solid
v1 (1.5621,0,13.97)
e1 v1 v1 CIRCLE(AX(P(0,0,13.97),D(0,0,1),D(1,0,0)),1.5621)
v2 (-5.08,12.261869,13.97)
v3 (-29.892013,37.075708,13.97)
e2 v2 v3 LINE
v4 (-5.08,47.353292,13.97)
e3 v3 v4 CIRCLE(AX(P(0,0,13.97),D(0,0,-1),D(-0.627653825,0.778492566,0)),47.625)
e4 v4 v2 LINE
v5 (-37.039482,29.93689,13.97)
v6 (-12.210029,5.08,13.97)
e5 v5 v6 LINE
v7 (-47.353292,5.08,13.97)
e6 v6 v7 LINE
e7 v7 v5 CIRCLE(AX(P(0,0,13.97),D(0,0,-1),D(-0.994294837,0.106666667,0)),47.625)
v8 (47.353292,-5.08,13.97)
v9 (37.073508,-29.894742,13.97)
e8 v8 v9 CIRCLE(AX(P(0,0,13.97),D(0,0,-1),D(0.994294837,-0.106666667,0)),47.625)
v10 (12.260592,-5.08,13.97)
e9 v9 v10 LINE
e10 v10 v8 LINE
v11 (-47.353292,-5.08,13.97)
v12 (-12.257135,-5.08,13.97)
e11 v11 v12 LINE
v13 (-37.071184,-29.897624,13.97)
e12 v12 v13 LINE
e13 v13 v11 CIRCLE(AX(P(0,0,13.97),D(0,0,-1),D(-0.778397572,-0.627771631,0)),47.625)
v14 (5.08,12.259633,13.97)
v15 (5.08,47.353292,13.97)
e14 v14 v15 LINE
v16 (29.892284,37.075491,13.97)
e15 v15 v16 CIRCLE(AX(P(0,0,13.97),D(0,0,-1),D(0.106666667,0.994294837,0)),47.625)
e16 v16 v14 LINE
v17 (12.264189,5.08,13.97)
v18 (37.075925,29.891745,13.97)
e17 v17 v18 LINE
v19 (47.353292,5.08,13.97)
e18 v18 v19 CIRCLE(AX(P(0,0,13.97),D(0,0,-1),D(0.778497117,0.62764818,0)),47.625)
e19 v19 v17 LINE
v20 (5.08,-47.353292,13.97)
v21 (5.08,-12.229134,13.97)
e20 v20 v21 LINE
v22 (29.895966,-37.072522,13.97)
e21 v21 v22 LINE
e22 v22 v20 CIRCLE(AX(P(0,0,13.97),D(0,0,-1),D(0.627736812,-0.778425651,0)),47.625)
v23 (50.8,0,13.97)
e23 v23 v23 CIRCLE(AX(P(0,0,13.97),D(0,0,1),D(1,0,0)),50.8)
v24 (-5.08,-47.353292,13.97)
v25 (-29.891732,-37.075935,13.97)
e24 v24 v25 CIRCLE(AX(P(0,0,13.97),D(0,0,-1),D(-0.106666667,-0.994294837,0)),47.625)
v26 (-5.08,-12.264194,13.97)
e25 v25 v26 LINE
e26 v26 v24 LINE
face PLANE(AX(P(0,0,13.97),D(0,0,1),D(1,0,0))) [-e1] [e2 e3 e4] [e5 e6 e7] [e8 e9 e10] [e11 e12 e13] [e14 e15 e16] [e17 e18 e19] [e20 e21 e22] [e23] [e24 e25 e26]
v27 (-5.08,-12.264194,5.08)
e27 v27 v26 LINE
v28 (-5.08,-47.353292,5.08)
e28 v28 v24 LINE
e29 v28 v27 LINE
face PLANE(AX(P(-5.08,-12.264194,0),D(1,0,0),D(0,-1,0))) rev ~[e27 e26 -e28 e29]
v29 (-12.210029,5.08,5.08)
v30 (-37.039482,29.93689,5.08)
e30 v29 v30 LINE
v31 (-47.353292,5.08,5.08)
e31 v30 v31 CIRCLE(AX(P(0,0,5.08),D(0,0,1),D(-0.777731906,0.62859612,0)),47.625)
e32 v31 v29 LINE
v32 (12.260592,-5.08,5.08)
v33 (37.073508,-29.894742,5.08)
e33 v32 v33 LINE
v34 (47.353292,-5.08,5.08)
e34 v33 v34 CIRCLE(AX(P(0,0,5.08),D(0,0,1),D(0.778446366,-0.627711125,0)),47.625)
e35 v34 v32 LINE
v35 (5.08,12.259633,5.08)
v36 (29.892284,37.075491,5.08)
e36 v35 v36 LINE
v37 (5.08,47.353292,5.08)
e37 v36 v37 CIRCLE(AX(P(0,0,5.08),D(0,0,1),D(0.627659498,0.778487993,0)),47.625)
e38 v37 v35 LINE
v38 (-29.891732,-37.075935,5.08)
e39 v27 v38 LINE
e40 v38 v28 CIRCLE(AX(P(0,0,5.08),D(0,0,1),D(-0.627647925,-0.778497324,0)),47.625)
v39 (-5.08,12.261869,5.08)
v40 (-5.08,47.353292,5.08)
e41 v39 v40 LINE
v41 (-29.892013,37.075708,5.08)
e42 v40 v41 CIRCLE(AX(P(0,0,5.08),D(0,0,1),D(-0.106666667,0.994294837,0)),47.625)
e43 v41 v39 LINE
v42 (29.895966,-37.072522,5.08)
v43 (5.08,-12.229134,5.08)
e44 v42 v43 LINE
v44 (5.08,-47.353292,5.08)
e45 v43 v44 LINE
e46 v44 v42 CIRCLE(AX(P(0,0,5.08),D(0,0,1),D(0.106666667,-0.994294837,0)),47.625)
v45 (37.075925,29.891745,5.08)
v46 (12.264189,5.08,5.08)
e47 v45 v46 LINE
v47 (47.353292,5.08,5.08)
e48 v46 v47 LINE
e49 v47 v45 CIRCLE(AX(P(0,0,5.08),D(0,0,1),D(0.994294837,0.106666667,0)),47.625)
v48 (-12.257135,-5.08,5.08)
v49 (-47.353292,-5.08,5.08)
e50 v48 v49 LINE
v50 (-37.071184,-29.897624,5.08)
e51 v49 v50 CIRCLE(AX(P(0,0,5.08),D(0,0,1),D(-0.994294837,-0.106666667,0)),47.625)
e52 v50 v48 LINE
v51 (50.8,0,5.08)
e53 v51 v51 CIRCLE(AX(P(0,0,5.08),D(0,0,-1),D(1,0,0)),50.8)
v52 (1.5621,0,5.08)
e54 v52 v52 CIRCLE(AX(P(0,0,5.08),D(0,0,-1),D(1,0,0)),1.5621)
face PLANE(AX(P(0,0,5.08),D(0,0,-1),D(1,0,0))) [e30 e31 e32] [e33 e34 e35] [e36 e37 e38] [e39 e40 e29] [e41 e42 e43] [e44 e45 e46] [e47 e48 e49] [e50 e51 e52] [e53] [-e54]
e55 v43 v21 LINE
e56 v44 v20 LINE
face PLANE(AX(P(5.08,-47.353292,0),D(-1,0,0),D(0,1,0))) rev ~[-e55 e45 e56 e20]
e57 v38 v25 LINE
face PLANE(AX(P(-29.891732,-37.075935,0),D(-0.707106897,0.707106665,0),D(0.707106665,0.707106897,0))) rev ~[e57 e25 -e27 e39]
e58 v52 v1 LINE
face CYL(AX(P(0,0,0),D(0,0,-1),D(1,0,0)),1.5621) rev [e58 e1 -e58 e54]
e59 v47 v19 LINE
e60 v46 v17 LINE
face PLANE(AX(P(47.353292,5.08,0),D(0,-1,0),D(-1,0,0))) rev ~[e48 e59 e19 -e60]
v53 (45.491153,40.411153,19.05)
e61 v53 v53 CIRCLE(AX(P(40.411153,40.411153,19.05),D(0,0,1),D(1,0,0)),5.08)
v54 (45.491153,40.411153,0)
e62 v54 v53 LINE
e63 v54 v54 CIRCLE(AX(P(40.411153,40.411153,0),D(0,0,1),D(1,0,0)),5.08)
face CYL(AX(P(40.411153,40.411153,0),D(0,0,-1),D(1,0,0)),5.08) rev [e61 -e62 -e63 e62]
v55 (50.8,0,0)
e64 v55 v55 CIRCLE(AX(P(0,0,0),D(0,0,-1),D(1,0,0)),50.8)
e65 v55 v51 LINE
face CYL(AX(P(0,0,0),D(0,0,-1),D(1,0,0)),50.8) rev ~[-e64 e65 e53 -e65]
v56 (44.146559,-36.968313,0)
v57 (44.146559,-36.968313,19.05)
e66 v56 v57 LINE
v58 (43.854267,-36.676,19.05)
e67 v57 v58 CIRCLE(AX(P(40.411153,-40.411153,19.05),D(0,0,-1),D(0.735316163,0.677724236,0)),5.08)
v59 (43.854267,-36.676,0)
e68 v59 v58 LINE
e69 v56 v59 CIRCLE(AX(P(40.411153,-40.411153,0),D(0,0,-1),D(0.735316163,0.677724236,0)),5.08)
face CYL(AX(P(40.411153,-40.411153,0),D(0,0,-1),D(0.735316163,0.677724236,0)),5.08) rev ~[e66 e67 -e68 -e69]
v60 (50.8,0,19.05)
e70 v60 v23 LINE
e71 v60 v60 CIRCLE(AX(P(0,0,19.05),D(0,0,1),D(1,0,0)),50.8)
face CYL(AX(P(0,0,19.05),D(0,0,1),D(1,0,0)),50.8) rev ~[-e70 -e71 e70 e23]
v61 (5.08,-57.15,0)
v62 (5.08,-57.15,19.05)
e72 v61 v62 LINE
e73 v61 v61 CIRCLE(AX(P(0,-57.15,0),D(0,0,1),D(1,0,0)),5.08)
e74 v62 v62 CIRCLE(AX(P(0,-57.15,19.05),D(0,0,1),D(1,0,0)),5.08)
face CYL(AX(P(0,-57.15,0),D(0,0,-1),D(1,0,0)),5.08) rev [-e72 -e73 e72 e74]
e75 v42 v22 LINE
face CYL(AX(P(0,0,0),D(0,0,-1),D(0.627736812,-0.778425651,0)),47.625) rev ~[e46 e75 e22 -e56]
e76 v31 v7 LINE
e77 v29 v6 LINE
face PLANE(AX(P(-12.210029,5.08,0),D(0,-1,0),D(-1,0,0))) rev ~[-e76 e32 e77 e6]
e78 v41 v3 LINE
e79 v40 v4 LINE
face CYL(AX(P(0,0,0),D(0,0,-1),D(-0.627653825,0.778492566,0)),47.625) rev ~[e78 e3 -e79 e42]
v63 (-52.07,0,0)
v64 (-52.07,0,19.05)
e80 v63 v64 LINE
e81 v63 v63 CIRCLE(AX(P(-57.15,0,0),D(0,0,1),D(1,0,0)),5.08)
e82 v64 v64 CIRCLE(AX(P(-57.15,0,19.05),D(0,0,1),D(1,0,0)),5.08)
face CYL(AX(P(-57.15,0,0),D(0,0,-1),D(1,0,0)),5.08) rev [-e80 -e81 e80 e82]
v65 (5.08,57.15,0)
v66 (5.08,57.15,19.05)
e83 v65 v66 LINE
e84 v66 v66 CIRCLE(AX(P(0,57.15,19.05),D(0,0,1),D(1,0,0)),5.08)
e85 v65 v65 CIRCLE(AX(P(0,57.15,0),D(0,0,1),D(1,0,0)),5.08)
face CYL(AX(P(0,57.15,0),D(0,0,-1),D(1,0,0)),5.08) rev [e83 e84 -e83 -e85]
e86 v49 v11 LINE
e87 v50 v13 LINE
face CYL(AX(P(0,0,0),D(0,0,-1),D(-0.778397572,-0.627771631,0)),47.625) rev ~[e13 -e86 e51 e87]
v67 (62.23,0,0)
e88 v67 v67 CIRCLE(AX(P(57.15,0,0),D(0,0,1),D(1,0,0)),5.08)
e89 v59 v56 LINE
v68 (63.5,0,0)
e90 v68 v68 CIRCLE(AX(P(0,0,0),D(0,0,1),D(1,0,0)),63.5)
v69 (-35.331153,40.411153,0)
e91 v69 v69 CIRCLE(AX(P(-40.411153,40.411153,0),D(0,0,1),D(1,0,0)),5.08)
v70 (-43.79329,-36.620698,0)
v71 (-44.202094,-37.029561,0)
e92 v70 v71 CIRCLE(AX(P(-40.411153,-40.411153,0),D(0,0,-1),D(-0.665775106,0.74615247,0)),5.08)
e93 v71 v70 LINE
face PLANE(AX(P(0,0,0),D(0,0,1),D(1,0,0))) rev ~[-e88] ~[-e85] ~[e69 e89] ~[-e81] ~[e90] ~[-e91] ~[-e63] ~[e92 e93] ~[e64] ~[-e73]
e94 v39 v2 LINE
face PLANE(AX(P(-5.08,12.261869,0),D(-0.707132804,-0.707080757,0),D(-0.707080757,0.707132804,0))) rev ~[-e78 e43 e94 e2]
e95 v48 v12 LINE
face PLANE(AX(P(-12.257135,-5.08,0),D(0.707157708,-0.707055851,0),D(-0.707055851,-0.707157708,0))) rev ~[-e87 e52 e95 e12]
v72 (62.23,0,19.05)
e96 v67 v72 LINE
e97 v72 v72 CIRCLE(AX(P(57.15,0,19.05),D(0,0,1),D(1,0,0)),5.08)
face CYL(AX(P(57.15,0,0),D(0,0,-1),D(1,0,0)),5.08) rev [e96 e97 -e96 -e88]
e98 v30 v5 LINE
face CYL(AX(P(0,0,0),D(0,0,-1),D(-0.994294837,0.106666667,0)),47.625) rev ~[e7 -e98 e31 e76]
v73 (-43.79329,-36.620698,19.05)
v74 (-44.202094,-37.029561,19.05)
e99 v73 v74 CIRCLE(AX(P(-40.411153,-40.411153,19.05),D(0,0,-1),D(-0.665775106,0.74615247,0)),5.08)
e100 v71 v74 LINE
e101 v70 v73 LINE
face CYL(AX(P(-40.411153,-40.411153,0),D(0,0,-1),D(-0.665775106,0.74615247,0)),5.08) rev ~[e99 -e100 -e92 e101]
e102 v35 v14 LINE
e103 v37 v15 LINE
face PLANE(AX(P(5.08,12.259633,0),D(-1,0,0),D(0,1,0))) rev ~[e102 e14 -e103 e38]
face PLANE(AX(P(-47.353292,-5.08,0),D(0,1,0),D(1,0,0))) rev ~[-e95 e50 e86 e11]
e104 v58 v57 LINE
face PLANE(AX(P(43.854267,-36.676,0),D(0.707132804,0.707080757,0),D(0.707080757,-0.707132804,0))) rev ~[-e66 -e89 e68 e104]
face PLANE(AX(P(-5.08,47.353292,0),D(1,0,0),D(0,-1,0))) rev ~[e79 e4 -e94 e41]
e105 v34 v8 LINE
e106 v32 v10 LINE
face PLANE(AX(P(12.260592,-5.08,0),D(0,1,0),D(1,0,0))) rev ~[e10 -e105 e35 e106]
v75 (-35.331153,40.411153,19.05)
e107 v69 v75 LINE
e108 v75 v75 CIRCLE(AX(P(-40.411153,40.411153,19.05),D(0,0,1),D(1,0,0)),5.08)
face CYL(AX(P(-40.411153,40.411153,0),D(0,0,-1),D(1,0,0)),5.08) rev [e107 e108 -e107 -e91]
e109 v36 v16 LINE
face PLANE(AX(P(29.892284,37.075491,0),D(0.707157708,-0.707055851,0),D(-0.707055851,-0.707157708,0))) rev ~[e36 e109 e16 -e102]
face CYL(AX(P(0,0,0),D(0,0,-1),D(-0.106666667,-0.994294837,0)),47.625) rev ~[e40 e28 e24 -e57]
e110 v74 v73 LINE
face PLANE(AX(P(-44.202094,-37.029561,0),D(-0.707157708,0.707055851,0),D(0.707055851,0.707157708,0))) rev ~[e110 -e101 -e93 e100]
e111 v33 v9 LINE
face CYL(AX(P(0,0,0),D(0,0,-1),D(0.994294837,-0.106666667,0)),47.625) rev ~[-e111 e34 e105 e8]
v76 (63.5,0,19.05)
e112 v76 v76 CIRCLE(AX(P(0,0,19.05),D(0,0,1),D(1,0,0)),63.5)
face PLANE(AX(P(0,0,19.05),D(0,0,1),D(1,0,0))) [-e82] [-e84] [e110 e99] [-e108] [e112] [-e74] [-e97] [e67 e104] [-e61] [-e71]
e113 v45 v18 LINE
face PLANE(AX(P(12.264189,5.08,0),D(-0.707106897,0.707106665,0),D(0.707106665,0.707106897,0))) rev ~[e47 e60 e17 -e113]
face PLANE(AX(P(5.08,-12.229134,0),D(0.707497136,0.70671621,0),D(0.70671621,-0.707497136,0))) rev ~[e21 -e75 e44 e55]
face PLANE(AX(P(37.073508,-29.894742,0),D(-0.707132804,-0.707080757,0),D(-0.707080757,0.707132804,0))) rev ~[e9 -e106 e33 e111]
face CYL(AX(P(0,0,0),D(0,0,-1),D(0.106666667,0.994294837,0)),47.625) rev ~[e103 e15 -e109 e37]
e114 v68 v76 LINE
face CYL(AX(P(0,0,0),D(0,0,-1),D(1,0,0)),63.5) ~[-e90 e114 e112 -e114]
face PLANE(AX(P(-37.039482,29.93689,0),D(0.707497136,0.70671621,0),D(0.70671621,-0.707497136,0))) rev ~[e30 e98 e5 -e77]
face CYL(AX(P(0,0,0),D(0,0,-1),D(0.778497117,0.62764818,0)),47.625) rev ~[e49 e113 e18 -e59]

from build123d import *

# Parameters (mm, degrees)
F0_R     = 63.5
F0_R_2   = 5.08
F0_R_3   = 1.5621
F1_DEPTH = 19.05
F2_R     = 50.8
F2_R_2   = 1.5621
F3_DEPTH = 5.08
F4_R     = 50.8
F4_R_2   = 1.5621
F5_DEPTH = 5.08


with BuildPart() as f1:
    # F0 (on Top) → F1 (new body)
    with BuildSketch(Plane.XY):
        Circle(F0_R)
        with BuildLine():
            ThreePointArc((-43.7932900831, -36.6206979979), (-36.8187913893, -44.0029962675), (-44.2020942404, -37.0295610466))
            Line((-44.2020942404, -37.0295610466), (-43.7932900831, -36.6206979979))
        make_face(mode=Mode.SUBTRACT)
        with BuildLine():
            Line((-5.08, -12.2641944787), (-5.08, -47.3532915963))
            Line((-5.08, -47.3532915963), (-5.08, -50.545361805))
            ThreePointArc((-5.08, -50.545361805), (-19.4403188674, -46.9330800431), (-32.1488664849, -39.3330698488))
            Line((-32.1488664849, -39.3330698488), (-29.8917324097, -37.0759350327))
            Line((-29.8917324097, -37.0759350327), (-5.08, -12.2641944787))
        make_face(mode=Mode.SUBTRACT)
        with BuildLine():
            ThreePointArc((-39.328136569, -32.154901244), (-46.9315884756, -19.4439194393), (-50.545361805, -5.08))
            Line((-50.545361805, -5.08), (-47.3532915963, -5.08))
            Line((-47.3532915963, -5.08), (-12.2571351119, -5.08))
            Line((-12.2571351119, -5.08), (-37.0711843605, -29.8976239041))
            Line((-37.0711843605, -29.8976239041), (-39.328136569, -32.154901244))
        make_face(mode=Mode.SUBTRACT)
        with Locations((0, -57.15)):
            Circle(F0_R_2, mode=Mode.SUBTRACT)
        with BuildLine():
            ThreePointArc((44.1465586521, -36.9683134237), (36.8189179009, -44.0031227929), (43.8542666003, -36.675999857))
            Line((43.8542666003, -36.675999857), (44.1465586521, -36.9683134237))
        make_face(mode=Mode.SUBTRACT)
        with BuildLine():
            ThreePointArc((32.151702841, -39.3307513839), (19.4420111057, -46.9323790593), (5.08, -50.545361805))
            Line((5.08, -50.545361805), (5.08, -47.3532915963))
            Line((5.08, -47.3532915963), (5.08, -12.2291341303))
            Line((5.08, -12.2291341303), (29.8959656944, -37.0725216326))
            Line((29.8959656944, -37.0725216326), (32.151702841, -39.3307513839))
        make_face(mode=Mode.SUBTRACT)
        with BuildLine():
            ThreePointArc((50.545361805, -5.08), (46.9323180233, -19.4421584439), (39.3305495108, -32.1519497882))
            Line((39.3305495108, -32.1519497882), (37.0735081629, -29.8947423052))
            Line((37.0735081629, -29.8947423052), (12.2605922736, -5.08))
            Line((12.2605922736, -5.08), (47.3532915963, -5.08))
            Line((47.3532915963, -5.08), (50.545361805, -5.08))
        make_face(mode=Mode.SUBTRACT)
        with Locations((-57.15, 0)):
            Circle(F0_R_2, mode=Mode.SUBTRACT)
        with BuildLine():
            ThreePointArc((-50.545361805, 5.08), (-46.921636061, 19.4679241152), (-39.2952191809, 32.1951199645))
            Line((-39.2952191809, 32.1951199645), (-37.0394820342, 29.9368902132))
            Line((-37.0394820342, 29.9368902132), (-12.2100285331, 5.08))
            Line((-12.2100285331, 5.08), (-47.3532915963, 5.08))
            Line((-47.3532915963, 5.08), (-50.545361805, 5.08))
        make_face(mode=Mode.SUBTRACT)
        with BuildLine():
            ThreePointArc((-32.1490547855, 39.3329159407), (-19.4404312097, 46.9330335092), (-5.08, 50.545361805))
            Line((-5.08, 50.545361805), (-5.08, 47.3532915963))
            Line((-5.08, 47.3532915963), (-5.08, 12.2618686706))
            Line((-5.08, 12.2618686706), (-29.8920134376, 37.0757084577))
            Line((-29.8920134376, 37.0757084577), (-32.1490547855, 39.3329159407))
        make_face(mode=Mode.SUBTRACT)
        with Locations((-40.4111525448, 40.4111525448)):
            Circle(F0_R_2, mode=Mode.SUBTRACT)
        Circle(F0_R_3, mode=Mode.SUBTRACT)
        with BuildLine():
            ThreePointArc((39.3330592962, 32.1488793958), (46.9330768525, 19.4403265702), (50.545361805, 5.08))
            Line((50.545361805, 5.08), (47.3532915963, 5.08))
            Line((47.3532915963, 5.08), (12.2641887856, 5.08))
            Line((12.2641887856, 5.08), (37.0759252209, 29.8917445796))
            Line((37.0759252209, 29.8917445796), (39.3330592962, 32.1488793958))
        make_face(mode=Mode.SUBTRACT)
        with BuildLine():
            Line((29.8922835881, 37.0754906493), (5.08, 12.2596326602))
            Line((5.08, 12.2596326602), (5.08, 47.3532915963))
            Line((5.08, 47.3532915963), (5.08, 50.545361805))
            ThreePointArc((5.08, 50.545361805), (19.4405392034, 46.9329887764), (32.1492357966, 39.3327679892))
            Line((32.1492357966, 39.3327679892), (29.8922835881, 37.0754906493))
        make_face(mode=Mode.SUBTRACT)
        with Locations((57.15, 0)):
            Circle(F0_R_2, mode=Mode.SUBTRACT)
        with Locations((0, 57.15)):
            Circle(F0_R_2, mode=Mode.SUBTRACT)
        with Locations((40.4111525448, 40.4111525448)):
            Circle(F0_R_2, mode=Mode.SUBTRACT)
        with BuildLine():
            Line((-37.0394820342, 29.9368902132), (-39.2952191809, 32.1951199645))
            ThreePointArc((-39.2952191809, 32.1951199645), (-46.921636061, 19.4679241152), (-50.545361805, 5.08))
            Line((-50.545361805, 5.08), (-47.3532915963, 5.08))
            ThreePointArc((-47.3532915963, 5.08), (-43.9886497637, 18.2521044532), (-37.0394820342, 29.9368902132))
        make_face()
        with BuildLine():
            Line((-5.08, 47.3532915963), (-5.08, 50.545361805))
            ThreePointArc((-5.08, 50.545361805), (-19.4404312097, 46.9330335092), (-32.1490547855, 39.3329159407))
            Line((-32.1490547855, 39.3329159407), (-29.8920134376, 37.0757084577))
            ThreePointArc((-29.8920134376, 37.0757084577), (-18.2254659683, 43.9996933539), (-5.08, 47.3532915963))
        make_face()
        with BuildLine():
            Line((-47.3532915963, -5.08), (-50.545361805, -5.08))
            ThreePointArc((-50.545361805, -5.08), (-46.9315884756, -19.4439194393), (-39.328136569, -32.154901244))
            Line((-39.328136569, -32.154901244), (-37.0711843605, -29.8976239041))
            ThreePointArc((-37.0711843605, -29.8976239041), (-43.9983141632, -18.2287952371), (-47.3532915963, -5.08))
        make_face()
        with BuildLine():
            Line((-5.08, -50.545361805), (-5.08, -47.3532915963))
            ThreePointArc((-5.08, -47.3532915963), (-18.2252992134, -43.9997624264), (-29.8917324097, -37.0759350327))
            Line((-29.8917324097, -37.0759350327), (-32.1488664849, -39.3330698488))
            ThreePointArc((-32.1488664849, -39.3330698488), (-19.4403188674, -46.9330800431), (-5.08, -50.545361805))
        make_face()
        with BuildLine():
            Line((5.08, -47.3532915963), (5.08, -50.545361805))
            ThreePointArc((5.08, -50.545361805), (19.4420111057, -46.9323790593), (32.151702841, -39.3307513839))
            Line((32.151702841, -39.3307513839), (29.8959656944, -37.0725216326))
            ThreePointArc((29.8959656944, -37.0725216326), (18.2278112187, -43.9987218357), (5.08, -47.3532915963))
        make_face()
        with BuildLine():
            Line((37.0735081629, -29.8947423052), (39.3305495108, -32.1519497882))
            ThreePointArc((39.3305495108, -32.1519497882), (46.9323180233, -19.4421584439), (50.545361805, -5.08))
            Line((50.545361805, -5.08), (47.3532915963, -5.08))
            ThreePointArc((47.3532915963, -5.08), (43.9990225836, -18.2270852494), (37.0735081629, -29.8947423052))
        make_face()
        with BuildLine():
            Line((47.3532915963, 5.08), (50.545361805, 5.08))
            ThreePointArc((50.545361805, 5.08), (46.9330768525, 19.4403265702), (39.3330592962, 32.1488793958))
            Line((39.3330592962, 32.1488793958), (37.0759252209, 29.8917445796))
            ThreePointArc((37.0759252209, 29.8917445796), (43.9997594353, 18.2253064347), (47.3532915963, 5.08))
        make_face()
        with BuildLine():
            ThreePointArc((5.08, 47.3532915963), (18.2256262696, 43.9996269539), (29.8922835881, 37.0754906493))
            Line((29.8922835881, 37.0754906493), (32.1492357966, 39.3327679892))
            ThreePointArc((32.1492357966, 39.3327679892), (19.4405392034, 46.9329887764), (5.08, 50.545361805))
            Line((5.08, 50.545361805), (5.08, 47.3532915963))
        make_face()
    extrude(amount=F1_DEPTH)

    # F2 (on face) → F3 (cut)
    with BuildSketch(Plane(origin=(0, 0, 0), x_dir=(1, 0, 0), z_dir=(0, 0, -1))):
        Circle(F2_R)
        with BuildLine():
            Line((-29.8920134376, -37.0757084577), (-5.08, -12.2618686706))
            Line((-5.08, -12.2618686706), (-5.08, -47.3532915963))
            ThreePointArc((-5.08, -47.3532915963), (-18.2254659683, -43.9996933539), (-29.8920134376, -37.0757084577))
        make_face(mode=Mode.SUBTRACT)
        with BuildLine():
            Line((-47.3532915963, -5.08), (-12.2100285331, -5.08))
            Line((-12.2100285331, -5.08), (-37.0394820342, -29.9368902132))
            ThreePointArc((-37.0394820342, -29.9368902132), (-43.9886497637, -18.2521044532), (-47.3532915963, -5.08))
        make_face(mode=Mode.SUBTRACT)
        with BuildLine():
            Line((5.08, -47.3532915963), (5.08, -12.2596326602))
            Line((5.08, -12.2596326602), (29.8922835881, -37.0754906493))
            ThreePointArc((29.8922835881, -37.0754906493), (18.2256262696, -43.9996269539), (5.08, -47.3532915963))
        make_face(mode=Mode.SUBTRACT)
        with BuildLine():
            Line((37.0759252209, -29.8917445796), (12.2641887856, -5.08))
            Line((12.2641887856, -5.08), (47.3532915963, -5.08))
            ThreePointArc((47.3532915963, -5.08), (43.9997594353, -18.2253064347), (37.0759252209, -29.8917445796))
        make_face(mode=Mode.SUBTRACT)
        with BuildLine():
            Line((-37.0711843605, 29.8976239041), (-12.2571351119, 5.08))
            Line((-12.2571351119, 5.08), (-47.3532915963, 5.08))
            ThreePointArc((-47.3532915963, 5.08), (-43.9983141632, 18.2287952371), (-37.0711843605, 29.8976239041))
        make_face(mode=Mode.SUBTRACT)
        with BuildLine():
            Line((-5.08, 47.3532915963), (-5.08, 12.2641944787))
            Line((-5.08, 12.2641944787), (-29.8917324097, 37.0759350327))
            ThreePointArc((-29.8917324097, 37.0759350327), (-18.2252992134, 43.9997624264), (-5.08, 47.3532915963))
        make_face(mode=Mode.SUBTRACT)
        Circle(F2_R_2, mode=Mode.SUBTRACT)
        with BuildLine():
            ThreePointArc((37.0735081629, 29.8947423052), (43.9990225836, 18.2270852494), (47.3532915963, 5.08))
            Line((47.3532915963, 5.08), (12.2605922736, 5.08))
            Line((12.2605922736, 5.08), (37.0735081629, 29.8947423052))
        make_face(mode=Mode.SUBTRACT)
        with BuildLine():
            Line((29.8959656944, 37.0725216326), (5.08, 12.2291341303))
            Line((5.08, 12.2291341303), (5.08, 47.3532915963))
            ThreePointArc((5.08, 47.3532915963), (18.2278112187, 43.9987218357), (29.8959656944, 37.0725216326))
        make_face(mode=Mode.SUBTRACT)
        Circle(F2_R_2)
    extrude(amount=-F3_DEPTH, mode=Mode.SUBTRACT)

    # F4 (on face) → F5 (cut)
    with BuildSketch(Plane.XY.offset(19.05)):
        Circle(F4_R)
        with BuildLine():
            ThreePointArc((-5.08, -47.3532915963), (-18.2252992134, -43.9997624264), (-29.8917324097, -37.0759350327))
            Line((-29.8917324097, -37.0759350327), (-5.08, -12.2641944787))
            Line((-5.08, -12.2641944787), (-5.08, -47.3532915963))
        make_face(mode=Mode.SUBTRACT)
        with BuildLine():
            ThreePointArc((-37.0711843605, -29.8976239041), (-43.9983141632, -18.2287952371), (-47.3532915963, -5.08))
            Line((-47.3532915963, -5.08), (-12.2571351119, -5.08))
            Line((-12.2571351119, -5.08), (-37.0711843605, -29.8976239041))
        make_face(mode=Mode.SUBTRACT)
        with BuildLine():
            ThreePointArc((29.8959656944, -37.0725216326), (18.2278112187, -43.9987218357), (5.08, -47.3532915963))
            Line((5.08, -47.3532915963), (5.08, -12.2291341303))
            Line((5.08, -12.2291341303), (29.8959656944, -37.0725216326))
        make_face(mode=Mode.SUBTRACT)
        with BuildLine():
            Line((37.0735081629, -29.8947423052), (12.2605922736, -5.08))
            Line((12.2605922736, -5.08), (47.3532915963, -5.08))
            ThreePointArc((47.3532915963, -5.08), (43.9990225836, -18.2270852494), (37.0735081629, -29.8947423052))
        make_face(mode=Mode.SUBTRACT)
        with BuildLine():
            ThreePointArc((-47.3532915963, 5.08), (-43.9886497637, 18.2521044532), (-37.0394820342, 29.9368902132))
            Line((-37.0394820342, 29.9368902132), (-12.2100285331, 5.08))
            Line((-12.2100285331, 5.08), (-47.3532915963, 5.08))
        make_face(mode=Mode.SUBTRACT)
        with BuildLine():
            ThreePointArc((-29.8920134376, 37.0757084577), (-18.2254659683, 43.9996933539), (-5.08, 47.3532915963))
            Line((-5.08, 47.3532915963), (-5.08, 12.2618686706))
            Line((-5.08, 12.2618686706), (-29.8920134376, 37.0757084577))
        make_face(mode=Mode.SUBTRACT)
        Circle(F4_R_2, mode=Mode.SUBTRACT)
        with BuildLine():
            ThreePointArc((37.0759252209, 29.8917445796), (43.9997594353, 18.2253064347), (47.3532915963, 5.08))
            Line((47.3532915963, 5.08), (12.2641887856, 5.08))
            Line((12.2641887856, 5.08), (37.0759252209, 29.8917445796))
        make_face(mode=Mode.SUBTRACT)
        with BuildLine():
            ThreePointArc((5.08, 47.3532915963), (18.2256262696, 43.9996269539), (29.8922835881, 37.0754906493))
            Line((29.8922835881, 37.0754906493), (5.08, 12.2596326602))
            Line((5.08, 12.2596326602), (5.08, 47.3532915963))
        make_face(mode=Mode.SUBTRACT)
    extrude(amount=-F5_DEPTH, mode=Mode.SUBTRACT)


solid = f1.part
